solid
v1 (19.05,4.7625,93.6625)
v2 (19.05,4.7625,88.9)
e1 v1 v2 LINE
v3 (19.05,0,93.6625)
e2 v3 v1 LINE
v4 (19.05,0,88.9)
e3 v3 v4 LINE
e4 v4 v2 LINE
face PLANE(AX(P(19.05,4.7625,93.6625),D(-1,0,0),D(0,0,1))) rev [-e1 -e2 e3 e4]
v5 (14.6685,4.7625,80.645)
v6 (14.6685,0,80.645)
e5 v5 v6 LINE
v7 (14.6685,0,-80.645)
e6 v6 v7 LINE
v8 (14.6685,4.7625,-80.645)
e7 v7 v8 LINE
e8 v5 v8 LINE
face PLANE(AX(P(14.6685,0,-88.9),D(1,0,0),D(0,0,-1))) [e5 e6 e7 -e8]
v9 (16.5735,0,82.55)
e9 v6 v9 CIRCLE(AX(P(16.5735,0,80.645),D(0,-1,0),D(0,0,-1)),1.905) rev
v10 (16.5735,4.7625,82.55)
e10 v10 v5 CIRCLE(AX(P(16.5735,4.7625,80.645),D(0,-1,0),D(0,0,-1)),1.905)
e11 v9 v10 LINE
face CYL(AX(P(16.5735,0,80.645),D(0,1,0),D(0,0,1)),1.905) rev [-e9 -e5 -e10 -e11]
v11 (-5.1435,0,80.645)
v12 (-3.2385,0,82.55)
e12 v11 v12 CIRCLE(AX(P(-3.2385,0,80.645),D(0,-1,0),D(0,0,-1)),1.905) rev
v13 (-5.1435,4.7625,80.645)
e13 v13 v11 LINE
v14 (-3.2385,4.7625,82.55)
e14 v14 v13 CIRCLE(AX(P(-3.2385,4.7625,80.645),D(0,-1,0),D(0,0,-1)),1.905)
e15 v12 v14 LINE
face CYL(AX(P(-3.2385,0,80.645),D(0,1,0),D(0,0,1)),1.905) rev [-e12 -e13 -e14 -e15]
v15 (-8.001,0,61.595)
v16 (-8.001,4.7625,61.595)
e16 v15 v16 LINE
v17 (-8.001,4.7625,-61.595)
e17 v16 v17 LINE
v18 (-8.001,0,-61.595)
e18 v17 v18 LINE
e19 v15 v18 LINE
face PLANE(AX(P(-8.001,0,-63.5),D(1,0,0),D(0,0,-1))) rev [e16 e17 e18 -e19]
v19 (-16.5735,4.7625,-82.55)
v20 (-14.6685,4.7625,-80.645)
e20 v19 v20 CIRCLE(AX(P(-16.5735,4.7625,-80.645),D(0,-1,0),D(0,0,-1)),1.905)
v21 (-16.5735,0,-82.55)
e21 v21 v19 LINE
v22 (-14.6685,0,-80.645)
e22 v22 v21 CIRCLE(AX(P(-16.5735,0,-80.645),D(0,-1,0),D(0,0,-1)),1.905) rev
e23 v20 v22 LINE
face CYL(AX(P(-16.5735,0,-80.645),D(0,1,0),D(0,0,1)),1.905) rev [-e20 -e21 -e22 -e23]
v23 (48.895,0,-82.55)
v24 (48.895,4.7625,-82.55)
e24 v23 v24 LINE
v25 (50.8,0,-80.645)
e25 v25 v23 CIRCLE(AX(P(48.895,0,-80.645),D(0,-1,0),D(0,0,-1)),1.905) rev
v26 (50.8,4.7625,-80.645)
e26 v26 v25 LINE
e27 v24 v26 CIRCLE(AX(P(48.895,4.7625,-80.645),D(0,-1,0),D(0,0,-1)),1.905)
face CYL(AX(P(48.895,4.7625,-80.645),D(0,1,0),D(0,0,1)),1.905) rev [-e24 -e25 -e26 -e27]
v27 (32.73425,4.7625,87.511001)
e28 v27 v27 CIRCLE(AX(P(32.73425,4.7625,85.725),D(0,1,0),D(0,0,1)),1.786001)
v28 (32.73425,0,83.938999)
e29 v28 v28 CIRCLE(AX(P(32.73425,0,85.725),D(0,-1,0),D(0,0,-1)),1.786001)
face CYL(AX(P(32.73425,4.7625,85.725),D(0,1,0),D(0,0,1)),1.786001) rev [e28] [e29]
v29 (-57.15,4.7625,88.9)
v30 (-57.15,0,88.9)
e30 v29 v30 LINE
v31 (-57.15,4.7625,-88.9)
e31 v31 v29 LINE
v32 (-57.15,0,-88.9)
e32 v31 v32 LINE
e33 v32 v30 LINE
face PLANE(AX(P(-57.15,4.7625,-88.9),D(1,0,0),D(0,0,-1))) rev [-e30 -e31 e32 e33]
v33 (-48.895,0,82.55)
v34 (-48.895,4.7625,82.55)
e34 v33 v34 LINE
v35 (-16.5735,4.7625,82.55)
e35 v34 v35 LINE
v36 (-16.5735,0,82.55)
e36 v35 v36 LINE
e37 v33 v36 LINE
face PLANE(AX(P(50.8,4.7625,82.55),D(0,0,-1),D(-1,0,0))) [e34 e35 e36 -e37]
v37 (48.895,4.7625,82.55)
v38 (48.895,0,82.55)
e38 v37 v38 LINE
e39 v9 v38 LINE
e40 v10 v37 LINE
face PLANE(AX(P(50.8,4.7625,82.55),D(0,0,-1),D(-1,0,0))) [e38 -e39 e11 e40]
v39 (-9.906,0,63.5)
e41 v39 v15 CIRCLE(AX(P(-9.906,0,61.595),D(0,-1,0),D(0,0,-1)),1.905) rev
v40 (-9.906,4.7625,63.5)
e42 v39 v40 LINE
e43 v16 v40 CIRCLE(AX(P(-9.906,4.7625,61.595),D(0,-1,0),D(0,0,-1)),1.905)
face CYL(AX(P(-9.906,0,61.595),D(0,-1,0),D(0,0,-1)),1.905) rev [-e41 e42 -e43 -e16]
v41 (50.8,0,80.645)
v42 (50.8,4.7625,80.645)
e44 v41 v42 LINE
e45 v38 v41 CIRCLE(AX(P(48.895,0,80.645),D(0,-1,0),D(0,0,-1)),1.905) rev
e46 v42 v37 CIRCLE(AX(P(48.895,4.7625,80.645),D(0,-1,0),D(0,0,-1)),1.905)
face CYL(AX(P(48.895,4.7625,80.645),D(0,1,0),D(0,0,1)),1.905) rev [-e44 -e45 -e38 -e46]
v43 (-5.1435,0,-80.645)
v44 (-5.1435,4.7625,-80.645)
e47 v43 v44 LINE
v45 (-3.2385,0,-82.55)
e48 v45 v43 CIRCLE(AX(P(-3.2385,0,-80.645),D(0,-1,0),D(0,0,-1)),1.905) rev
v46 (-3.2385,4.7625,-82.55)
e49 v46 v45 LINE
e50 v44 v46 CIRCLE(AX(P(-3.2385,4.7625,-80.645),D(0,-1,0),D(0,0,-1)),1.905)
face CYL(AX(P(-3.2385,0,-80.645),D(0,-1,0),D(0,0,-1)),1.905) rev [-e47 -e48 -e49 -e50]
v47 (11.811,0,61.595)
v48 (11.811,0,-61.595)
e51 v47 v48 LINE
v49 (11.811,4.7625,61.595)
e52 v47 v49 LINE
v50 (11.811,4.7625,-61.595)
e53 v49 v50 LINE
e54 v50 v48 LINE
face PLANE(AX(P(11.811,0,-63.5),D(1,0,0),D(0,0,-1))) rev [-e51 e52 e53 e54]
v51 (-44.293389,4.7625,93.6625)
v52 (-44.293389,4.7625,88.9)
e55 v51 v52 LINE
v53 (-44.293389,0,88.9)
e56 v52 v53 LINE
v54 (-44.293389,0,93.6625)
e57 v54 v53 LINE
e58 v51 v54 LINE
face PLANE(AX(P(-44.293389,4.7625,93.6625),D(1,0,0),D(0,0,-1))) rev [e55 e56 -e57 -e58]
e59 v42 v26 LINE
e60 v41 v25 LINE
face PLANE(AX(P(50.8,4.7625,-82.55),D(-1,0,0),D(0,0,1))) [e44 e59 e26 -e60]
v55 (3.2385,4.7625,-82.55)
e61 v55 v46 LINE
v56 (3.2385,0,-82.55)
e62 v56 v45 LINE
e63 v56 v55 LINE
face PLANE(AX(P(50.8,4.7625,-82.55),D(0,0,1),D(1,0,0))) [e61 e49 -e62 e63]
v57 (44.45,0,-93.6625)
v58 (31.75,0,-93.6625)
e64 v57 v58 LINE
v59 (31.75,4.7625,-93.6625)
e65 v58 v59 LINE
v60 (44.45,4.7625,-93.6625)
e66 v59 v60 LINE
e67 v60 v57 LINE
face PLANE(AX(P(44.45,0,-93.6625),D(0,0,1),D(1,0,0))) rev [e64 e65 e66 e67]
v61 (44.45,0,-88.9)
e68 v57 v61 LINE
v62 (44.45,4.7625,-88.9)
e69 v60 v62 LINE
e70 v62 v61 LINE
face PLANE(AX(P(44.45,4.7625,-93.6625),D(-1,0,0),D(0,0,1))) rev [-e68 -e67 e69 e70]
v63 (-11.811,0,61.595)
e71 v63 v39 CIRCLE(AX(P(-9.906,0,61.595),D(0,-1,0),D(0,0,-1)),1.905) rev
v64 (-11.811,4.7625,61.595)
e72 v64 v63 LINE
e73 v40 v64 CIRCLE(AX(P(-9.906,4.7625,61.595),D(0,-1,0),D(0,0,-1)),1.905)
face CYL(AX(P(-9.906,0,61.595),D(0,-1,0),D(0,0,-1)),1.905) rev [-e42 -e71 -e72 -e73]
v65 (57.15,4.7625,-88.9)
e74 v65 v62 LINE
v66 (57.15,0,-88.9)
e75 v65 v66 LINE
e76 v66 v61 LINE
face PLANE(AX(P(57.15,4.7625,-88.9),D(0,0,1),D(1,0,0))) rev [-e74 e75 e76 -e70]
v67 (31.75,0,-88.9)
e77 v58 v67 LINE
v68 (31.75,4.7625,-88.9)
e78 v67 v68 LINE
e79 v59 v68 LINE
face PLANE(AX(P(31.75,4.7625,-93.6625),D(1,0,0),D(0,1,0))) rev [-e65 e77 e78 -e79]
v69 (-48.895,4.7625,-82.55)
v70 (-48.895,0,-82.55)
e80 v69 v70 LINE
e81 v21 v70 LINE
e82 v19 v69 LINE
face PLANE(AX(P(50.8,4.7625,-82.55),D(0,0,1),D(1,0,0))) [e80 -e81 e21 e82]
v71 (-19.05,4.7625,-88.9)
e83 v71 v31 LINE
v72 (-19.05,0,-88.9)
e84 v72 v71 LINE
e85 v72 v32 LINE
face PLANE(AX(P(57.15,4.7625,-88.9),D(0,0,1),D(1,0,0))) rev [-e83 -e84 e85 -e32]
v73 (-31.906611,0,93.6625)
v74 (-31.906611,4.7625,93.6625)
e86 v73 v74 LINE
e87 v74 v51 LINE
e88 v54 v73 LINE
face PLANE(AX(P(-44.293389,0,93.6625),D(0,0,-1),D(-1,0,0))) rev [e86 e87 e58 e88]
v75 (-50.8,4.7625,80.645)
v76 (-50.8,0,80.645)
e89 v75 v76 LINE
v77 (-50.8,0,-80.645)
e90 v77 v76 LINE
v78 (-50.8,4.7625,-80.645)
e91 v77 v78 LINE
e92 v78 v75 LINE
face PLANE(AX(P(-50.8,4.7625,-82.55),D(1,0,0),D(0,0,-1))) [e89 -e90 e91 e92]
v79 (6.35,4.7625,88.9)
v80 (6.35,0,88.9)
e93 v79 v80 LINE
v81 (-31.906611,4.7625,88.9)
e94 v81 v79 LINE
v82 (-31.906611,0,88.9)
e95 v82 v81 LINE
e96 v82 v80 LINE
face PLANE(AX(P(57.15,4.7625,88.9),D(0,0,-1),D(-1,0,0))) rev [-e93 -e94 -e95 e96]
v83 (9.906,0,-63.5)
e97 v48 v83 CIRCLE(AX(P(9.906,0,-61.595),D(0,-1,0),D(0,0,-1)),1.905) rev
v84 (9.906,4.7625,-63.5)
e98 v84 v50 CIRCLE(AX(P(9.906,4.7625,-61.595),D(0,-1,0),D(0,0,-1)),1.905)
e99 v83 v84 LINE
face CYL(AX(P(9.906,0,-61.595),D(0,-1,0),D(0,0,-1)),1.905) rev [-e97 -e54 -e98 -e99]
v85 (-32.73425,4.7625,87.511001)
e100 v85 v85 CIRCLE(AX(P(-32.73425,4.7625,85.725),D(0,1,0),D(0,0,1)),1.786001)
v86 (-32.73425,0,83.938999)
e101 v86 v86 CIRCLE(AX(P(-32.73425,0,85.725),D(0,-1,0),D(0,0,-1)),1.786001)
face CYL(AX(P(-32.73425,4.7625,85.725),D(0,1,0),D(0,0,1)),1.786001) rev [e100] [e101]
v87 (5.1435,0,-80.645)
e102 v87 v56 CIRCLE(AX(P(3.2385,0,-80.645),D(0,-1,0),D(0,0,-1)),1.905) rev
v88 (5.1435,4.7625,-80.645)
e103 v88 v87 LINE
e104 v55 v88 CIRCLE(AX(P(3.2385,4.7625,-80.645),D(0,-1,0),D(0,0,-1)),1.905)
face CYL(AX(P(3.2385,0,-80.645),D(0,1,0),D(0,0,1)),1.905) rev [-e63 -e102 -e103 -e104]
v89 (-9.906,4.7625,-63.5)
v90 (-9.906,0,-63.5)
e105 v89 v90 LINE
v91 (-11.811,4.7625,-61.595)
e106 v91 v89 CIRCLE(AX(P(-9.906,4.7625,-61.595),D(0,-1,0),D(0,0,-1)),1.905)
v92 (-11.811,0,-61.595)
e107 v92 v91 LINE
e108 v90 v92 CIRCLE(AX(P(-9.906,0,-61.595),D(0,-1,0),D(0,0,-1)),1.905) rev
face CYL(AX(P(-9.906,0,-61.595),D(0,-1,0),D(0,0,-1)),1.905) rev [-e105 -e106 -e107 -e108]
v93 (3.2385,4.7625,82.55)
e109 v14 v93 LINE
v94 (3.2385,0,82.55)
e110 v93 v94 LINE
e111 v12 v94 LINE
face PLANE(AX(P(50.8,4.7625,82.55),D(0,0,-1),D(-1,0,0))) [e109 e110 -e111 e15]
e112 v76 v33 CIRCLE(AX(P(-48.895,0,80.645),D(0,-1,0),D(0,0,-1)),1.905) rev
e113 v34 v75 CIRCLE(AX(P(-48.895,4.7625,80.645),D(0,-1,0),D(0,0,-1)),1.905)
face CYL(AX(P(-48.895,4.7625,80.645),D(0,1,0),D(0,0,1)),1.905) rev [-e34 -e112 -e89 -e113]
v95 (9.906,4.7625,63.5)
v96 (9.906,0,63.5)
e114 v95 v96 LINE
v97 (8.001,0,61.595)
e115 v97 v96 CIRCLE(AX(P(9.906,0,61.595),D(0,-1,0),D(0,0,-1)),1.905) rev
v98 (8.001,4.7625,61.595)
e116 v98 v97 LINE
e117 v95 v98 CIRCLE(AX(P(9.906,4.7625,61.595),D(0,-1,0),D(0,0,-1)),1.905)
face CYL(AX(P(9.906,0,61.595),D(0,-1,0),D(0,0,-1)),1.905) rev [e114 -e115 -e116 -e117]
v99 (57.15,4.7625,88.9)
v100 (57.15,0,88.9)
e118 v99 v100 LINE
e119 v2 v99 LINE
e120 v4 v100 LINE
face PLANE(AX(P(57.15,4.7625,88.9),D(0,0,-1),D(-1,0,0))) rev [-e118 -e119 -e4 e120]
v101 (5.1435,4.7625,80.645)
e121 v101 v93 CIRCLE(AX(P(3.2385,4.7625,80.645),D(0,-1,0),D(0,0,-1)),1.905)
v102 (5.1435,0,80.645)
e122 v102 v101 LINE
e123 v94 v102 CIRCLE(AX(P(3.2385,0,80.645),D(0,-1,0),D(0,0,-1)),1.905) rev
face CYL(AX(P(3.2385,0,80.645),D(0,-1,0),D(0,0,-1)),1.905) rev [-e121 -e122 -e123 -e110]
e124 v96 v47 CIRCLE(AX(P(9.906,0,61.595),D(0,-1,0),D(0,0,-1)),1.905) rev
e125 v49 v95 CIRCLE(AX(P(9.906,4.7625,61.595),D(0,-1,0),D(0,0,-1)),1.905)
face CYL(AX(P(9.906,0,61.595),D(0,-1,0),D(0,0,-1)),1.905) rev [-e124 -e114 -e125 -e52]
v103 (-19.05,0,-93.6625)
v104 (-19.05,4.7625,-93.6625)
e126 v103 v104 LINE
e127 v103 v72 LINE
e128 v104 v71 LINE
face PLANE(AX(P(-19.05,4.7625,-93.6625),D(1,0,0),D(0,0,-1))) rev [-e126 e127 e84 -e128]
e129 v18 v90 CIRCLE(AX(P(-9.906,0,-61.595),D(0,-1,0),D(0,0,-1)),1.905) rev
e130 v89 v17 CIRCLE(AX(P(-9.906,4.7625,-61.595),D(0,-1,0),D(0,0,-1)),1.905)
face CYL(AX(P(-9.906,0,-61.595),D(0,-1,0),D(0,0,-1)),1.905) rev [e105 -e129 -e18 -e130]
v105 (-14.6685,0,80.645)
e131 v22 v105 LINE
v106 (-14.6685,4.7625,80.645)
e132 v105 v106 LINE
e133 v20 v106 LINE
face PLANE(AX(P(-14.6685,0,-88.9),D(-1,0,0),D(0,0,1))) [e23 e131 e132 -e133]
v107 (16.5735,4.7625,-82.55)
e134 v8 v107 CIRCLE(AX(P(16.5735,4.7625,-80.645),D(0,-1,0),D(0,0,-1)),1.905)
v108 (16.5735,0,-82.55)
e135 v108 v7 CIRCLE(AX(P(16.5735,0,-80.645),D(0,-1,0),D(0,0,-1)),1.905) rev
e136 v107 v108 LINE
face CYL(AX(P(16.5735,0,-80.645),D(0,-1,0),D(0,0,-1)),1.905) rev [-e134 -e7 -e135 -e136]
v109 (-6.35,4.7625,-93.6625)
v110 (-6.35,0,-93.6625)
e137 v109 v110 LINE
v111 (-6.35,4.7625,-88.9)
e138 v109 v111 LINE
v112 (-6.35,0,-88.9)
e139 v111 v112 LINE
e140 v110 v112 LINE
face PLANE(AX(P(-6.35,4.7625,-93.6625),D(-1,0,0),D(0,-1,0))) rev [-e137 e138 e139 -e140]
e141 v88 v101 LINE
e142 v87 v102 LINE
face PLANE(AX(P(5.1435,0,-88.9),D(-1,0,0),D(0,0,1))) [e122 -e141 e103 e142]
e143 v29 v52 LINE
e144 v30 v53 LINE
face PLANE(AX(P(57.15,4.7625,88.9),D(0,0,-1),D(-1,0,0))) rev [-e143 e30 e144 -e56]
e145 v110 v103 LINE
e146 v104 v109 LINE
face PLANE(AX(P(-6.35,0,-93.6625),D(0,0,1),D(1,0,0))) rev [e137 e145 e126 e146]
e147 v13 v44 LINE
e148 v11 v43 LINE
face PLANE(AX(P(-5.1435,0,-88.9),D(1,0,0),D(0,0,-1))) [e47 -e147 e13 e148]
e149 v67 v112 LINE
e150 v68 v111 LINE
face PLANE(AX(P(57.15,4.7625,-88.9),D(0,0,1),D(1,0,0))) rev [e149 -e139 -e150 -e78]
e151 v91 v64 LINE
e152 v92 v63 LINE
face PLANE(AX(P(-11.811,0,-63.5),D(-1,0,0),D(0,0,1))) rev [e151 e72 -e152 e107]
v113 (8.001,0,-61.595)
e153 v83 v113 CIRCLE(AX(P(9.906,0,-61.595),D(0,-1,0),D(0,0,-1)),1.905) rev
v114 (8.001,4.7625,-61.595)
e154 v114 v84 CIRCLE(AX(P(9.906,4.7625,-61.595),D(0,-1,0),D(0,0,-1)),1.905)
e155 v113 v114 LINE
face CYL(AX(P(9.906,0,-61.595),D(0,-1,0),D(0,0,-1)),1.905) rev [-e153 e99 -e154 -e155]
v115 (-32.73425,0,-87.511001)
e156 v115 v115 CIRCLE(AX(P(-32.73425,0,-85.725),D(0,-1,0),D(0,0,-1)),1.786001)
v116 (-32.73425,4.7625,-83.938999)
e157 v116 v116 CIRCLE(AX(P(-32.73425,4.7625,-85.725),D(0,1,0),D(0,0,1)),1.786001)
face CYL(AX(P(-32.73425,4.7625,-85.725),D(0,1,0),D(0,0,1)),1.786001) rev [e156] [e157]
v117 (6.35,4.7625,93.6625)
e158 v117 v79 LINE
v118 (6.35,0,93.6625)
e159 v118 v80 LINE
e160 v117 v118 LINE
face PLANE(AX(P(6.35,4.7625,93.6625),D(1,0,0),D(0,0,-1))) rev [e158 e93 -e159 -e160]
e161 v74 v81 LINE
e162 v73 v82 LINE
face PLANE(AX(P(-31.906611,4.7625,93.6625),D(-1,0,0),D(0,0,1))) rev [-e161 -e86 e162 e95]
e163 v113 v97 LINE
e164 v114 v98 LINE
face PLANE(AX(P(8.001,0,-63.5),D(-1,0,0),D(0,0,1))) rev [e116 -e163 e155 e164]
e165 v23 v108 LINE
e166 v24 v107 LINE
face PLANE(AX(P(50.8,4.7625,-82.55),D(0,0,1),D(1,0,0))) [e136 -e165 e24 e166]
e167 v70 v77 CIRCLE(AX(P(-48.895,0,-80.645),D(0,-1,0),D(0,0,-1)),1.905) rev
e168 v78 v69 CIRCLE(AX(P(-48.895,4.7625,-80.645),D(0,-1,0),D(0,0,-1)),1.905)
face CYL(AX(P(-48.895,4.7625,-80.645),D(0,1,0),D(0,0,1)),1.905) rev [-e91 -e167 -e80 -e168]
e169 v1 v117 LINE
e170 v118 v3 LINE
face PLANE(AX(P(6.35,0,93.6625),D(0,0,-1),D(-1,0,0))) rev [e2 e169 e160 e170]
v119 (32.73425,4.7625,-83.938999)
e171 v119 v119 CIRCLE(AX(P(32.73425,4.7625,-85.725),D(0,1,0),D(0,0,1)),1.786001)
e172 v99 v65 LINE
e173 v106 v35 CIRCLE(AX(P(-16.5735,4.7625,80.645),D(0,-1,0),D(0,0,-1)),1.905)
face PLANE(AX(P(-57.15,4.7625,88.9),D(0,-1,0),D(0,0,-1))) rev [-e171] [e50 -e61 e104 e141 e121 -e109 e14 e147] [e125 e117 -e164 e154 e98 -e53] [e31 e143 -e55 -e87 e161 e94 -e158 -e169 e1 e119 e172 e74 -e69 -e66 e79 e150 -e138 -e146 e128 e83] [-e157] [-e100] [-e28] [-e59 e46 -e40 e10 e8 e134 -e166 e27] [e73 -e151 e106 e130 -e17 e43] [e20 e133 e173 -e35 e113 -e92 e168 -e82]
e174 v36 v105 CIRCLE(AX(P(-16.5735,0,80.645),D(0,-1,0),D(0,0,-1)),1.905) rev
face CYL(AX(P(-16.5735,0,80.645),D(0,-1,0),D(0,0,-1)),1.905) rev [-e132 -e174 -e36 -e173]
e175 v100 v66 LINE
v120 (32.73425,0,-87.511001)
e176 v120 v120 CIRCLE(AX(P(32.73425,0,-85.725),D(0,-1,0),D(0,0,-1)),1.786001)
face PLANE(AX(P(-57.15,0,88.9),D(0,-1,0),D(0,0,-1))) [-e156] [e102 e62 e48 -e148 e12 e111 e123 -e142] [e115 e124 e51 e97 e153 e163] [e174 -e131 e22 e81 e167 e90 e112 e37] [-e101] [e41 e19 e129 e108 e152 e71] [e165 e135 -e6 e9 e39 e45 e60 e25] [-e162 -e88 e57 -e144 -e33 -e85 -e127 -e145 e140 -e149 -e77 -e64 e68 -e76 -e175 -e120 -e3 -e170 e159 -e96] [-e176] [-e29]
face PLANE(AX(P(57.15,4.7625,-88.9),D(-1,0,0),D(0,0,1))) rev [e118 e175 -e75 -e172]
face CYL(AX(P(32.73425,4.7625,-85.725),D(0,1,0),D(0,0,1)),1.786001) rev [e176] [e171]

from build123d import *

# Parameters (mm, degrees)
SKETCH1_W                       = 114.3
SKETCH1_H                       = 177.8
SKETCH1_W_2                     = 101.6
SKETCH1_H_2                     = 165.1
BOSS_EXTRUDE1_DEPTH             = 4.7625
SKETCH2_W                       = 12.38677804
SKETCH2_H                       = 4.7625
SKETCH2_W_2                     = 12.7
BOSS_EXTRUDE2_DEPTH             = 4.7625
SKETCH3_W                       = 12.7
SKETCH3_H                       = 4.7625
BOSS_EXTRUDE3_DEPTH             = 4.7625
SKETCH4_W                       = 9.525
SKETCH4_H                       = 177.8
SKETCH4_W_2                     = 3.81
SKETCH4_H_2                     = 127
BOSS_EXTRUDE4_DEPTH             = 4.7625
FILLET1_R                       = 1.905
F_9_64_0_14063_DIAMETER_HOLE1_D = 3.572002


with BuildPart() as part:
    # Sketch1 → Boss-Extrude1 (new body)
    with BuildSketch(Plane(origin=(0, 0, 0), x_dir=(1, 0, 0), z_dir=(0, 1, 0))):
        Rectangle(SKETCH1_W, SKETCH1_H)
        Rectangle(SKETCH1_W_2, SKETCH1_H_2, mode=Mode.SUBTRACT)
    extrude(amount=BOSS_EXTRUDE1_DEPTH)

    # Sketch2 → Boss-Extrude2 (add)
    with BuildSketch(Plane.XY.offset(88.9)):
        with Locations((-38.1, 2.38125)):
            Rectangle(SKETCH2_W, SKETCH2_H)
        with Locations((12.7, 2.38125)):
            Rectangle(SKETCH2_W_2, SKETCH2_H)
    extrude(amount=BOSS_EXTRUDE2_DEPTH)

    # Sketch3 → Boss-Extrude3 (add)
    with BuildSketch(Plane(origin=(0, 0, -88.9), x_dir=(-1, 0, 0), z_dir=(0, 0, -1))):
        with Locations((-38.1, 2.38125)):
            Rectangle(SKETCH3_W, SKETCH3_H)
        with Locations((12.7, 2.38125)):
            Rectangle(SKETCH3_W, SKETCH3_H)
    extrude(amount=BOSS_EXTRUDE3_DEPTH)

    # Sketch4 → Boss-Extrude4 (add)
    # profile 1 of 2: a face of its own
    with BuildSketch(Plane(origin=(0, 4.7625, 0), x_dir=(-1, 0, 0), z_dir=(0, 1, 0))):
        with Locations((9.906, 0)):
            Rectangle(SKETCH4_W, SKETCH4_H)
        with Locations((9.906, 0)):
            Rectangle(SKETCH4_W_2, SKETCH4_H_2, mode=Mode.SUBTRACT)
    # profile 2 of 2: a face of its own
    with BuildSketch(Plane(origin=(0, 4.7625, 0), x_dir=(-1, 0, 0), z_dir=(0, 1, 0))):
        with Locations((-9.906, 0)):
            Rectangle(SKETCH4_W, SKETCH4_H)
        with Locations((-9.906, 0)):
            Rectangle(SKETCH4_W_2, SKETCH4_H_2, mode=Mode.SUBTRACT)
    extrude(amount=-BOSS_EXTRUDE4_DEPTH)

    # Fillet1
    fillet1_edges = [part.edges().sort_by_distance(p)[0] for p in [
        (-8.001, 2.38125, -63.5),
        (-11.811, 2.38125, -63.5),
        (8.001, 2.38125, -63.5),
        (11.811, 2.38125, -63.5),
        (-8.001, 2.38125, 63.5),
        (-11.811, 2.38125, 63.5),
        (8.001, 2.38125, 63.5),
        (11.811, 2.38125, 63.5),
        (-5.1435, 2.38125, 82.55),
        (5.1435, 2.38125, 82.55),
        (-5.1435, 2.38125, -82.55),
        (5.1435, 2.38125, -82.55),
        (-14.6685, 2.38125, -82.55),
        (-50.8, 2.38125, -82.55),
        (-50.8, 2.38125, 82.55),
        (-14.6685, 2.38125, 82.55),
        (14.6685, 2.38125, 82.55),
        (50.8, 2.38125, 82.55),
        (14.6685, 2.38125, -82.55),
        (50.8, 2.38125, -82.55),
    ]]
    fillet(fillet1_edges, radius=FILLET1_R - 0.0001)  # a hair under: the kernel refuses the full size

    # 9/64 (0.14063) Diameter Hole1 (through all)
    with Locations(Plane(origin=(0, 4.7625, 0), x_dir=(-1, 0, 0), z_dir=(0, 1, 0))):
        with Locations((32.73425, -85.725), (-32.73425, -85.725), (32.73425, 85.725), (-32.73425, 85.725)):
            Hole(F_9_64_0_14063_DIAMETER_HOLE1_D / 2)


solid = part.part
